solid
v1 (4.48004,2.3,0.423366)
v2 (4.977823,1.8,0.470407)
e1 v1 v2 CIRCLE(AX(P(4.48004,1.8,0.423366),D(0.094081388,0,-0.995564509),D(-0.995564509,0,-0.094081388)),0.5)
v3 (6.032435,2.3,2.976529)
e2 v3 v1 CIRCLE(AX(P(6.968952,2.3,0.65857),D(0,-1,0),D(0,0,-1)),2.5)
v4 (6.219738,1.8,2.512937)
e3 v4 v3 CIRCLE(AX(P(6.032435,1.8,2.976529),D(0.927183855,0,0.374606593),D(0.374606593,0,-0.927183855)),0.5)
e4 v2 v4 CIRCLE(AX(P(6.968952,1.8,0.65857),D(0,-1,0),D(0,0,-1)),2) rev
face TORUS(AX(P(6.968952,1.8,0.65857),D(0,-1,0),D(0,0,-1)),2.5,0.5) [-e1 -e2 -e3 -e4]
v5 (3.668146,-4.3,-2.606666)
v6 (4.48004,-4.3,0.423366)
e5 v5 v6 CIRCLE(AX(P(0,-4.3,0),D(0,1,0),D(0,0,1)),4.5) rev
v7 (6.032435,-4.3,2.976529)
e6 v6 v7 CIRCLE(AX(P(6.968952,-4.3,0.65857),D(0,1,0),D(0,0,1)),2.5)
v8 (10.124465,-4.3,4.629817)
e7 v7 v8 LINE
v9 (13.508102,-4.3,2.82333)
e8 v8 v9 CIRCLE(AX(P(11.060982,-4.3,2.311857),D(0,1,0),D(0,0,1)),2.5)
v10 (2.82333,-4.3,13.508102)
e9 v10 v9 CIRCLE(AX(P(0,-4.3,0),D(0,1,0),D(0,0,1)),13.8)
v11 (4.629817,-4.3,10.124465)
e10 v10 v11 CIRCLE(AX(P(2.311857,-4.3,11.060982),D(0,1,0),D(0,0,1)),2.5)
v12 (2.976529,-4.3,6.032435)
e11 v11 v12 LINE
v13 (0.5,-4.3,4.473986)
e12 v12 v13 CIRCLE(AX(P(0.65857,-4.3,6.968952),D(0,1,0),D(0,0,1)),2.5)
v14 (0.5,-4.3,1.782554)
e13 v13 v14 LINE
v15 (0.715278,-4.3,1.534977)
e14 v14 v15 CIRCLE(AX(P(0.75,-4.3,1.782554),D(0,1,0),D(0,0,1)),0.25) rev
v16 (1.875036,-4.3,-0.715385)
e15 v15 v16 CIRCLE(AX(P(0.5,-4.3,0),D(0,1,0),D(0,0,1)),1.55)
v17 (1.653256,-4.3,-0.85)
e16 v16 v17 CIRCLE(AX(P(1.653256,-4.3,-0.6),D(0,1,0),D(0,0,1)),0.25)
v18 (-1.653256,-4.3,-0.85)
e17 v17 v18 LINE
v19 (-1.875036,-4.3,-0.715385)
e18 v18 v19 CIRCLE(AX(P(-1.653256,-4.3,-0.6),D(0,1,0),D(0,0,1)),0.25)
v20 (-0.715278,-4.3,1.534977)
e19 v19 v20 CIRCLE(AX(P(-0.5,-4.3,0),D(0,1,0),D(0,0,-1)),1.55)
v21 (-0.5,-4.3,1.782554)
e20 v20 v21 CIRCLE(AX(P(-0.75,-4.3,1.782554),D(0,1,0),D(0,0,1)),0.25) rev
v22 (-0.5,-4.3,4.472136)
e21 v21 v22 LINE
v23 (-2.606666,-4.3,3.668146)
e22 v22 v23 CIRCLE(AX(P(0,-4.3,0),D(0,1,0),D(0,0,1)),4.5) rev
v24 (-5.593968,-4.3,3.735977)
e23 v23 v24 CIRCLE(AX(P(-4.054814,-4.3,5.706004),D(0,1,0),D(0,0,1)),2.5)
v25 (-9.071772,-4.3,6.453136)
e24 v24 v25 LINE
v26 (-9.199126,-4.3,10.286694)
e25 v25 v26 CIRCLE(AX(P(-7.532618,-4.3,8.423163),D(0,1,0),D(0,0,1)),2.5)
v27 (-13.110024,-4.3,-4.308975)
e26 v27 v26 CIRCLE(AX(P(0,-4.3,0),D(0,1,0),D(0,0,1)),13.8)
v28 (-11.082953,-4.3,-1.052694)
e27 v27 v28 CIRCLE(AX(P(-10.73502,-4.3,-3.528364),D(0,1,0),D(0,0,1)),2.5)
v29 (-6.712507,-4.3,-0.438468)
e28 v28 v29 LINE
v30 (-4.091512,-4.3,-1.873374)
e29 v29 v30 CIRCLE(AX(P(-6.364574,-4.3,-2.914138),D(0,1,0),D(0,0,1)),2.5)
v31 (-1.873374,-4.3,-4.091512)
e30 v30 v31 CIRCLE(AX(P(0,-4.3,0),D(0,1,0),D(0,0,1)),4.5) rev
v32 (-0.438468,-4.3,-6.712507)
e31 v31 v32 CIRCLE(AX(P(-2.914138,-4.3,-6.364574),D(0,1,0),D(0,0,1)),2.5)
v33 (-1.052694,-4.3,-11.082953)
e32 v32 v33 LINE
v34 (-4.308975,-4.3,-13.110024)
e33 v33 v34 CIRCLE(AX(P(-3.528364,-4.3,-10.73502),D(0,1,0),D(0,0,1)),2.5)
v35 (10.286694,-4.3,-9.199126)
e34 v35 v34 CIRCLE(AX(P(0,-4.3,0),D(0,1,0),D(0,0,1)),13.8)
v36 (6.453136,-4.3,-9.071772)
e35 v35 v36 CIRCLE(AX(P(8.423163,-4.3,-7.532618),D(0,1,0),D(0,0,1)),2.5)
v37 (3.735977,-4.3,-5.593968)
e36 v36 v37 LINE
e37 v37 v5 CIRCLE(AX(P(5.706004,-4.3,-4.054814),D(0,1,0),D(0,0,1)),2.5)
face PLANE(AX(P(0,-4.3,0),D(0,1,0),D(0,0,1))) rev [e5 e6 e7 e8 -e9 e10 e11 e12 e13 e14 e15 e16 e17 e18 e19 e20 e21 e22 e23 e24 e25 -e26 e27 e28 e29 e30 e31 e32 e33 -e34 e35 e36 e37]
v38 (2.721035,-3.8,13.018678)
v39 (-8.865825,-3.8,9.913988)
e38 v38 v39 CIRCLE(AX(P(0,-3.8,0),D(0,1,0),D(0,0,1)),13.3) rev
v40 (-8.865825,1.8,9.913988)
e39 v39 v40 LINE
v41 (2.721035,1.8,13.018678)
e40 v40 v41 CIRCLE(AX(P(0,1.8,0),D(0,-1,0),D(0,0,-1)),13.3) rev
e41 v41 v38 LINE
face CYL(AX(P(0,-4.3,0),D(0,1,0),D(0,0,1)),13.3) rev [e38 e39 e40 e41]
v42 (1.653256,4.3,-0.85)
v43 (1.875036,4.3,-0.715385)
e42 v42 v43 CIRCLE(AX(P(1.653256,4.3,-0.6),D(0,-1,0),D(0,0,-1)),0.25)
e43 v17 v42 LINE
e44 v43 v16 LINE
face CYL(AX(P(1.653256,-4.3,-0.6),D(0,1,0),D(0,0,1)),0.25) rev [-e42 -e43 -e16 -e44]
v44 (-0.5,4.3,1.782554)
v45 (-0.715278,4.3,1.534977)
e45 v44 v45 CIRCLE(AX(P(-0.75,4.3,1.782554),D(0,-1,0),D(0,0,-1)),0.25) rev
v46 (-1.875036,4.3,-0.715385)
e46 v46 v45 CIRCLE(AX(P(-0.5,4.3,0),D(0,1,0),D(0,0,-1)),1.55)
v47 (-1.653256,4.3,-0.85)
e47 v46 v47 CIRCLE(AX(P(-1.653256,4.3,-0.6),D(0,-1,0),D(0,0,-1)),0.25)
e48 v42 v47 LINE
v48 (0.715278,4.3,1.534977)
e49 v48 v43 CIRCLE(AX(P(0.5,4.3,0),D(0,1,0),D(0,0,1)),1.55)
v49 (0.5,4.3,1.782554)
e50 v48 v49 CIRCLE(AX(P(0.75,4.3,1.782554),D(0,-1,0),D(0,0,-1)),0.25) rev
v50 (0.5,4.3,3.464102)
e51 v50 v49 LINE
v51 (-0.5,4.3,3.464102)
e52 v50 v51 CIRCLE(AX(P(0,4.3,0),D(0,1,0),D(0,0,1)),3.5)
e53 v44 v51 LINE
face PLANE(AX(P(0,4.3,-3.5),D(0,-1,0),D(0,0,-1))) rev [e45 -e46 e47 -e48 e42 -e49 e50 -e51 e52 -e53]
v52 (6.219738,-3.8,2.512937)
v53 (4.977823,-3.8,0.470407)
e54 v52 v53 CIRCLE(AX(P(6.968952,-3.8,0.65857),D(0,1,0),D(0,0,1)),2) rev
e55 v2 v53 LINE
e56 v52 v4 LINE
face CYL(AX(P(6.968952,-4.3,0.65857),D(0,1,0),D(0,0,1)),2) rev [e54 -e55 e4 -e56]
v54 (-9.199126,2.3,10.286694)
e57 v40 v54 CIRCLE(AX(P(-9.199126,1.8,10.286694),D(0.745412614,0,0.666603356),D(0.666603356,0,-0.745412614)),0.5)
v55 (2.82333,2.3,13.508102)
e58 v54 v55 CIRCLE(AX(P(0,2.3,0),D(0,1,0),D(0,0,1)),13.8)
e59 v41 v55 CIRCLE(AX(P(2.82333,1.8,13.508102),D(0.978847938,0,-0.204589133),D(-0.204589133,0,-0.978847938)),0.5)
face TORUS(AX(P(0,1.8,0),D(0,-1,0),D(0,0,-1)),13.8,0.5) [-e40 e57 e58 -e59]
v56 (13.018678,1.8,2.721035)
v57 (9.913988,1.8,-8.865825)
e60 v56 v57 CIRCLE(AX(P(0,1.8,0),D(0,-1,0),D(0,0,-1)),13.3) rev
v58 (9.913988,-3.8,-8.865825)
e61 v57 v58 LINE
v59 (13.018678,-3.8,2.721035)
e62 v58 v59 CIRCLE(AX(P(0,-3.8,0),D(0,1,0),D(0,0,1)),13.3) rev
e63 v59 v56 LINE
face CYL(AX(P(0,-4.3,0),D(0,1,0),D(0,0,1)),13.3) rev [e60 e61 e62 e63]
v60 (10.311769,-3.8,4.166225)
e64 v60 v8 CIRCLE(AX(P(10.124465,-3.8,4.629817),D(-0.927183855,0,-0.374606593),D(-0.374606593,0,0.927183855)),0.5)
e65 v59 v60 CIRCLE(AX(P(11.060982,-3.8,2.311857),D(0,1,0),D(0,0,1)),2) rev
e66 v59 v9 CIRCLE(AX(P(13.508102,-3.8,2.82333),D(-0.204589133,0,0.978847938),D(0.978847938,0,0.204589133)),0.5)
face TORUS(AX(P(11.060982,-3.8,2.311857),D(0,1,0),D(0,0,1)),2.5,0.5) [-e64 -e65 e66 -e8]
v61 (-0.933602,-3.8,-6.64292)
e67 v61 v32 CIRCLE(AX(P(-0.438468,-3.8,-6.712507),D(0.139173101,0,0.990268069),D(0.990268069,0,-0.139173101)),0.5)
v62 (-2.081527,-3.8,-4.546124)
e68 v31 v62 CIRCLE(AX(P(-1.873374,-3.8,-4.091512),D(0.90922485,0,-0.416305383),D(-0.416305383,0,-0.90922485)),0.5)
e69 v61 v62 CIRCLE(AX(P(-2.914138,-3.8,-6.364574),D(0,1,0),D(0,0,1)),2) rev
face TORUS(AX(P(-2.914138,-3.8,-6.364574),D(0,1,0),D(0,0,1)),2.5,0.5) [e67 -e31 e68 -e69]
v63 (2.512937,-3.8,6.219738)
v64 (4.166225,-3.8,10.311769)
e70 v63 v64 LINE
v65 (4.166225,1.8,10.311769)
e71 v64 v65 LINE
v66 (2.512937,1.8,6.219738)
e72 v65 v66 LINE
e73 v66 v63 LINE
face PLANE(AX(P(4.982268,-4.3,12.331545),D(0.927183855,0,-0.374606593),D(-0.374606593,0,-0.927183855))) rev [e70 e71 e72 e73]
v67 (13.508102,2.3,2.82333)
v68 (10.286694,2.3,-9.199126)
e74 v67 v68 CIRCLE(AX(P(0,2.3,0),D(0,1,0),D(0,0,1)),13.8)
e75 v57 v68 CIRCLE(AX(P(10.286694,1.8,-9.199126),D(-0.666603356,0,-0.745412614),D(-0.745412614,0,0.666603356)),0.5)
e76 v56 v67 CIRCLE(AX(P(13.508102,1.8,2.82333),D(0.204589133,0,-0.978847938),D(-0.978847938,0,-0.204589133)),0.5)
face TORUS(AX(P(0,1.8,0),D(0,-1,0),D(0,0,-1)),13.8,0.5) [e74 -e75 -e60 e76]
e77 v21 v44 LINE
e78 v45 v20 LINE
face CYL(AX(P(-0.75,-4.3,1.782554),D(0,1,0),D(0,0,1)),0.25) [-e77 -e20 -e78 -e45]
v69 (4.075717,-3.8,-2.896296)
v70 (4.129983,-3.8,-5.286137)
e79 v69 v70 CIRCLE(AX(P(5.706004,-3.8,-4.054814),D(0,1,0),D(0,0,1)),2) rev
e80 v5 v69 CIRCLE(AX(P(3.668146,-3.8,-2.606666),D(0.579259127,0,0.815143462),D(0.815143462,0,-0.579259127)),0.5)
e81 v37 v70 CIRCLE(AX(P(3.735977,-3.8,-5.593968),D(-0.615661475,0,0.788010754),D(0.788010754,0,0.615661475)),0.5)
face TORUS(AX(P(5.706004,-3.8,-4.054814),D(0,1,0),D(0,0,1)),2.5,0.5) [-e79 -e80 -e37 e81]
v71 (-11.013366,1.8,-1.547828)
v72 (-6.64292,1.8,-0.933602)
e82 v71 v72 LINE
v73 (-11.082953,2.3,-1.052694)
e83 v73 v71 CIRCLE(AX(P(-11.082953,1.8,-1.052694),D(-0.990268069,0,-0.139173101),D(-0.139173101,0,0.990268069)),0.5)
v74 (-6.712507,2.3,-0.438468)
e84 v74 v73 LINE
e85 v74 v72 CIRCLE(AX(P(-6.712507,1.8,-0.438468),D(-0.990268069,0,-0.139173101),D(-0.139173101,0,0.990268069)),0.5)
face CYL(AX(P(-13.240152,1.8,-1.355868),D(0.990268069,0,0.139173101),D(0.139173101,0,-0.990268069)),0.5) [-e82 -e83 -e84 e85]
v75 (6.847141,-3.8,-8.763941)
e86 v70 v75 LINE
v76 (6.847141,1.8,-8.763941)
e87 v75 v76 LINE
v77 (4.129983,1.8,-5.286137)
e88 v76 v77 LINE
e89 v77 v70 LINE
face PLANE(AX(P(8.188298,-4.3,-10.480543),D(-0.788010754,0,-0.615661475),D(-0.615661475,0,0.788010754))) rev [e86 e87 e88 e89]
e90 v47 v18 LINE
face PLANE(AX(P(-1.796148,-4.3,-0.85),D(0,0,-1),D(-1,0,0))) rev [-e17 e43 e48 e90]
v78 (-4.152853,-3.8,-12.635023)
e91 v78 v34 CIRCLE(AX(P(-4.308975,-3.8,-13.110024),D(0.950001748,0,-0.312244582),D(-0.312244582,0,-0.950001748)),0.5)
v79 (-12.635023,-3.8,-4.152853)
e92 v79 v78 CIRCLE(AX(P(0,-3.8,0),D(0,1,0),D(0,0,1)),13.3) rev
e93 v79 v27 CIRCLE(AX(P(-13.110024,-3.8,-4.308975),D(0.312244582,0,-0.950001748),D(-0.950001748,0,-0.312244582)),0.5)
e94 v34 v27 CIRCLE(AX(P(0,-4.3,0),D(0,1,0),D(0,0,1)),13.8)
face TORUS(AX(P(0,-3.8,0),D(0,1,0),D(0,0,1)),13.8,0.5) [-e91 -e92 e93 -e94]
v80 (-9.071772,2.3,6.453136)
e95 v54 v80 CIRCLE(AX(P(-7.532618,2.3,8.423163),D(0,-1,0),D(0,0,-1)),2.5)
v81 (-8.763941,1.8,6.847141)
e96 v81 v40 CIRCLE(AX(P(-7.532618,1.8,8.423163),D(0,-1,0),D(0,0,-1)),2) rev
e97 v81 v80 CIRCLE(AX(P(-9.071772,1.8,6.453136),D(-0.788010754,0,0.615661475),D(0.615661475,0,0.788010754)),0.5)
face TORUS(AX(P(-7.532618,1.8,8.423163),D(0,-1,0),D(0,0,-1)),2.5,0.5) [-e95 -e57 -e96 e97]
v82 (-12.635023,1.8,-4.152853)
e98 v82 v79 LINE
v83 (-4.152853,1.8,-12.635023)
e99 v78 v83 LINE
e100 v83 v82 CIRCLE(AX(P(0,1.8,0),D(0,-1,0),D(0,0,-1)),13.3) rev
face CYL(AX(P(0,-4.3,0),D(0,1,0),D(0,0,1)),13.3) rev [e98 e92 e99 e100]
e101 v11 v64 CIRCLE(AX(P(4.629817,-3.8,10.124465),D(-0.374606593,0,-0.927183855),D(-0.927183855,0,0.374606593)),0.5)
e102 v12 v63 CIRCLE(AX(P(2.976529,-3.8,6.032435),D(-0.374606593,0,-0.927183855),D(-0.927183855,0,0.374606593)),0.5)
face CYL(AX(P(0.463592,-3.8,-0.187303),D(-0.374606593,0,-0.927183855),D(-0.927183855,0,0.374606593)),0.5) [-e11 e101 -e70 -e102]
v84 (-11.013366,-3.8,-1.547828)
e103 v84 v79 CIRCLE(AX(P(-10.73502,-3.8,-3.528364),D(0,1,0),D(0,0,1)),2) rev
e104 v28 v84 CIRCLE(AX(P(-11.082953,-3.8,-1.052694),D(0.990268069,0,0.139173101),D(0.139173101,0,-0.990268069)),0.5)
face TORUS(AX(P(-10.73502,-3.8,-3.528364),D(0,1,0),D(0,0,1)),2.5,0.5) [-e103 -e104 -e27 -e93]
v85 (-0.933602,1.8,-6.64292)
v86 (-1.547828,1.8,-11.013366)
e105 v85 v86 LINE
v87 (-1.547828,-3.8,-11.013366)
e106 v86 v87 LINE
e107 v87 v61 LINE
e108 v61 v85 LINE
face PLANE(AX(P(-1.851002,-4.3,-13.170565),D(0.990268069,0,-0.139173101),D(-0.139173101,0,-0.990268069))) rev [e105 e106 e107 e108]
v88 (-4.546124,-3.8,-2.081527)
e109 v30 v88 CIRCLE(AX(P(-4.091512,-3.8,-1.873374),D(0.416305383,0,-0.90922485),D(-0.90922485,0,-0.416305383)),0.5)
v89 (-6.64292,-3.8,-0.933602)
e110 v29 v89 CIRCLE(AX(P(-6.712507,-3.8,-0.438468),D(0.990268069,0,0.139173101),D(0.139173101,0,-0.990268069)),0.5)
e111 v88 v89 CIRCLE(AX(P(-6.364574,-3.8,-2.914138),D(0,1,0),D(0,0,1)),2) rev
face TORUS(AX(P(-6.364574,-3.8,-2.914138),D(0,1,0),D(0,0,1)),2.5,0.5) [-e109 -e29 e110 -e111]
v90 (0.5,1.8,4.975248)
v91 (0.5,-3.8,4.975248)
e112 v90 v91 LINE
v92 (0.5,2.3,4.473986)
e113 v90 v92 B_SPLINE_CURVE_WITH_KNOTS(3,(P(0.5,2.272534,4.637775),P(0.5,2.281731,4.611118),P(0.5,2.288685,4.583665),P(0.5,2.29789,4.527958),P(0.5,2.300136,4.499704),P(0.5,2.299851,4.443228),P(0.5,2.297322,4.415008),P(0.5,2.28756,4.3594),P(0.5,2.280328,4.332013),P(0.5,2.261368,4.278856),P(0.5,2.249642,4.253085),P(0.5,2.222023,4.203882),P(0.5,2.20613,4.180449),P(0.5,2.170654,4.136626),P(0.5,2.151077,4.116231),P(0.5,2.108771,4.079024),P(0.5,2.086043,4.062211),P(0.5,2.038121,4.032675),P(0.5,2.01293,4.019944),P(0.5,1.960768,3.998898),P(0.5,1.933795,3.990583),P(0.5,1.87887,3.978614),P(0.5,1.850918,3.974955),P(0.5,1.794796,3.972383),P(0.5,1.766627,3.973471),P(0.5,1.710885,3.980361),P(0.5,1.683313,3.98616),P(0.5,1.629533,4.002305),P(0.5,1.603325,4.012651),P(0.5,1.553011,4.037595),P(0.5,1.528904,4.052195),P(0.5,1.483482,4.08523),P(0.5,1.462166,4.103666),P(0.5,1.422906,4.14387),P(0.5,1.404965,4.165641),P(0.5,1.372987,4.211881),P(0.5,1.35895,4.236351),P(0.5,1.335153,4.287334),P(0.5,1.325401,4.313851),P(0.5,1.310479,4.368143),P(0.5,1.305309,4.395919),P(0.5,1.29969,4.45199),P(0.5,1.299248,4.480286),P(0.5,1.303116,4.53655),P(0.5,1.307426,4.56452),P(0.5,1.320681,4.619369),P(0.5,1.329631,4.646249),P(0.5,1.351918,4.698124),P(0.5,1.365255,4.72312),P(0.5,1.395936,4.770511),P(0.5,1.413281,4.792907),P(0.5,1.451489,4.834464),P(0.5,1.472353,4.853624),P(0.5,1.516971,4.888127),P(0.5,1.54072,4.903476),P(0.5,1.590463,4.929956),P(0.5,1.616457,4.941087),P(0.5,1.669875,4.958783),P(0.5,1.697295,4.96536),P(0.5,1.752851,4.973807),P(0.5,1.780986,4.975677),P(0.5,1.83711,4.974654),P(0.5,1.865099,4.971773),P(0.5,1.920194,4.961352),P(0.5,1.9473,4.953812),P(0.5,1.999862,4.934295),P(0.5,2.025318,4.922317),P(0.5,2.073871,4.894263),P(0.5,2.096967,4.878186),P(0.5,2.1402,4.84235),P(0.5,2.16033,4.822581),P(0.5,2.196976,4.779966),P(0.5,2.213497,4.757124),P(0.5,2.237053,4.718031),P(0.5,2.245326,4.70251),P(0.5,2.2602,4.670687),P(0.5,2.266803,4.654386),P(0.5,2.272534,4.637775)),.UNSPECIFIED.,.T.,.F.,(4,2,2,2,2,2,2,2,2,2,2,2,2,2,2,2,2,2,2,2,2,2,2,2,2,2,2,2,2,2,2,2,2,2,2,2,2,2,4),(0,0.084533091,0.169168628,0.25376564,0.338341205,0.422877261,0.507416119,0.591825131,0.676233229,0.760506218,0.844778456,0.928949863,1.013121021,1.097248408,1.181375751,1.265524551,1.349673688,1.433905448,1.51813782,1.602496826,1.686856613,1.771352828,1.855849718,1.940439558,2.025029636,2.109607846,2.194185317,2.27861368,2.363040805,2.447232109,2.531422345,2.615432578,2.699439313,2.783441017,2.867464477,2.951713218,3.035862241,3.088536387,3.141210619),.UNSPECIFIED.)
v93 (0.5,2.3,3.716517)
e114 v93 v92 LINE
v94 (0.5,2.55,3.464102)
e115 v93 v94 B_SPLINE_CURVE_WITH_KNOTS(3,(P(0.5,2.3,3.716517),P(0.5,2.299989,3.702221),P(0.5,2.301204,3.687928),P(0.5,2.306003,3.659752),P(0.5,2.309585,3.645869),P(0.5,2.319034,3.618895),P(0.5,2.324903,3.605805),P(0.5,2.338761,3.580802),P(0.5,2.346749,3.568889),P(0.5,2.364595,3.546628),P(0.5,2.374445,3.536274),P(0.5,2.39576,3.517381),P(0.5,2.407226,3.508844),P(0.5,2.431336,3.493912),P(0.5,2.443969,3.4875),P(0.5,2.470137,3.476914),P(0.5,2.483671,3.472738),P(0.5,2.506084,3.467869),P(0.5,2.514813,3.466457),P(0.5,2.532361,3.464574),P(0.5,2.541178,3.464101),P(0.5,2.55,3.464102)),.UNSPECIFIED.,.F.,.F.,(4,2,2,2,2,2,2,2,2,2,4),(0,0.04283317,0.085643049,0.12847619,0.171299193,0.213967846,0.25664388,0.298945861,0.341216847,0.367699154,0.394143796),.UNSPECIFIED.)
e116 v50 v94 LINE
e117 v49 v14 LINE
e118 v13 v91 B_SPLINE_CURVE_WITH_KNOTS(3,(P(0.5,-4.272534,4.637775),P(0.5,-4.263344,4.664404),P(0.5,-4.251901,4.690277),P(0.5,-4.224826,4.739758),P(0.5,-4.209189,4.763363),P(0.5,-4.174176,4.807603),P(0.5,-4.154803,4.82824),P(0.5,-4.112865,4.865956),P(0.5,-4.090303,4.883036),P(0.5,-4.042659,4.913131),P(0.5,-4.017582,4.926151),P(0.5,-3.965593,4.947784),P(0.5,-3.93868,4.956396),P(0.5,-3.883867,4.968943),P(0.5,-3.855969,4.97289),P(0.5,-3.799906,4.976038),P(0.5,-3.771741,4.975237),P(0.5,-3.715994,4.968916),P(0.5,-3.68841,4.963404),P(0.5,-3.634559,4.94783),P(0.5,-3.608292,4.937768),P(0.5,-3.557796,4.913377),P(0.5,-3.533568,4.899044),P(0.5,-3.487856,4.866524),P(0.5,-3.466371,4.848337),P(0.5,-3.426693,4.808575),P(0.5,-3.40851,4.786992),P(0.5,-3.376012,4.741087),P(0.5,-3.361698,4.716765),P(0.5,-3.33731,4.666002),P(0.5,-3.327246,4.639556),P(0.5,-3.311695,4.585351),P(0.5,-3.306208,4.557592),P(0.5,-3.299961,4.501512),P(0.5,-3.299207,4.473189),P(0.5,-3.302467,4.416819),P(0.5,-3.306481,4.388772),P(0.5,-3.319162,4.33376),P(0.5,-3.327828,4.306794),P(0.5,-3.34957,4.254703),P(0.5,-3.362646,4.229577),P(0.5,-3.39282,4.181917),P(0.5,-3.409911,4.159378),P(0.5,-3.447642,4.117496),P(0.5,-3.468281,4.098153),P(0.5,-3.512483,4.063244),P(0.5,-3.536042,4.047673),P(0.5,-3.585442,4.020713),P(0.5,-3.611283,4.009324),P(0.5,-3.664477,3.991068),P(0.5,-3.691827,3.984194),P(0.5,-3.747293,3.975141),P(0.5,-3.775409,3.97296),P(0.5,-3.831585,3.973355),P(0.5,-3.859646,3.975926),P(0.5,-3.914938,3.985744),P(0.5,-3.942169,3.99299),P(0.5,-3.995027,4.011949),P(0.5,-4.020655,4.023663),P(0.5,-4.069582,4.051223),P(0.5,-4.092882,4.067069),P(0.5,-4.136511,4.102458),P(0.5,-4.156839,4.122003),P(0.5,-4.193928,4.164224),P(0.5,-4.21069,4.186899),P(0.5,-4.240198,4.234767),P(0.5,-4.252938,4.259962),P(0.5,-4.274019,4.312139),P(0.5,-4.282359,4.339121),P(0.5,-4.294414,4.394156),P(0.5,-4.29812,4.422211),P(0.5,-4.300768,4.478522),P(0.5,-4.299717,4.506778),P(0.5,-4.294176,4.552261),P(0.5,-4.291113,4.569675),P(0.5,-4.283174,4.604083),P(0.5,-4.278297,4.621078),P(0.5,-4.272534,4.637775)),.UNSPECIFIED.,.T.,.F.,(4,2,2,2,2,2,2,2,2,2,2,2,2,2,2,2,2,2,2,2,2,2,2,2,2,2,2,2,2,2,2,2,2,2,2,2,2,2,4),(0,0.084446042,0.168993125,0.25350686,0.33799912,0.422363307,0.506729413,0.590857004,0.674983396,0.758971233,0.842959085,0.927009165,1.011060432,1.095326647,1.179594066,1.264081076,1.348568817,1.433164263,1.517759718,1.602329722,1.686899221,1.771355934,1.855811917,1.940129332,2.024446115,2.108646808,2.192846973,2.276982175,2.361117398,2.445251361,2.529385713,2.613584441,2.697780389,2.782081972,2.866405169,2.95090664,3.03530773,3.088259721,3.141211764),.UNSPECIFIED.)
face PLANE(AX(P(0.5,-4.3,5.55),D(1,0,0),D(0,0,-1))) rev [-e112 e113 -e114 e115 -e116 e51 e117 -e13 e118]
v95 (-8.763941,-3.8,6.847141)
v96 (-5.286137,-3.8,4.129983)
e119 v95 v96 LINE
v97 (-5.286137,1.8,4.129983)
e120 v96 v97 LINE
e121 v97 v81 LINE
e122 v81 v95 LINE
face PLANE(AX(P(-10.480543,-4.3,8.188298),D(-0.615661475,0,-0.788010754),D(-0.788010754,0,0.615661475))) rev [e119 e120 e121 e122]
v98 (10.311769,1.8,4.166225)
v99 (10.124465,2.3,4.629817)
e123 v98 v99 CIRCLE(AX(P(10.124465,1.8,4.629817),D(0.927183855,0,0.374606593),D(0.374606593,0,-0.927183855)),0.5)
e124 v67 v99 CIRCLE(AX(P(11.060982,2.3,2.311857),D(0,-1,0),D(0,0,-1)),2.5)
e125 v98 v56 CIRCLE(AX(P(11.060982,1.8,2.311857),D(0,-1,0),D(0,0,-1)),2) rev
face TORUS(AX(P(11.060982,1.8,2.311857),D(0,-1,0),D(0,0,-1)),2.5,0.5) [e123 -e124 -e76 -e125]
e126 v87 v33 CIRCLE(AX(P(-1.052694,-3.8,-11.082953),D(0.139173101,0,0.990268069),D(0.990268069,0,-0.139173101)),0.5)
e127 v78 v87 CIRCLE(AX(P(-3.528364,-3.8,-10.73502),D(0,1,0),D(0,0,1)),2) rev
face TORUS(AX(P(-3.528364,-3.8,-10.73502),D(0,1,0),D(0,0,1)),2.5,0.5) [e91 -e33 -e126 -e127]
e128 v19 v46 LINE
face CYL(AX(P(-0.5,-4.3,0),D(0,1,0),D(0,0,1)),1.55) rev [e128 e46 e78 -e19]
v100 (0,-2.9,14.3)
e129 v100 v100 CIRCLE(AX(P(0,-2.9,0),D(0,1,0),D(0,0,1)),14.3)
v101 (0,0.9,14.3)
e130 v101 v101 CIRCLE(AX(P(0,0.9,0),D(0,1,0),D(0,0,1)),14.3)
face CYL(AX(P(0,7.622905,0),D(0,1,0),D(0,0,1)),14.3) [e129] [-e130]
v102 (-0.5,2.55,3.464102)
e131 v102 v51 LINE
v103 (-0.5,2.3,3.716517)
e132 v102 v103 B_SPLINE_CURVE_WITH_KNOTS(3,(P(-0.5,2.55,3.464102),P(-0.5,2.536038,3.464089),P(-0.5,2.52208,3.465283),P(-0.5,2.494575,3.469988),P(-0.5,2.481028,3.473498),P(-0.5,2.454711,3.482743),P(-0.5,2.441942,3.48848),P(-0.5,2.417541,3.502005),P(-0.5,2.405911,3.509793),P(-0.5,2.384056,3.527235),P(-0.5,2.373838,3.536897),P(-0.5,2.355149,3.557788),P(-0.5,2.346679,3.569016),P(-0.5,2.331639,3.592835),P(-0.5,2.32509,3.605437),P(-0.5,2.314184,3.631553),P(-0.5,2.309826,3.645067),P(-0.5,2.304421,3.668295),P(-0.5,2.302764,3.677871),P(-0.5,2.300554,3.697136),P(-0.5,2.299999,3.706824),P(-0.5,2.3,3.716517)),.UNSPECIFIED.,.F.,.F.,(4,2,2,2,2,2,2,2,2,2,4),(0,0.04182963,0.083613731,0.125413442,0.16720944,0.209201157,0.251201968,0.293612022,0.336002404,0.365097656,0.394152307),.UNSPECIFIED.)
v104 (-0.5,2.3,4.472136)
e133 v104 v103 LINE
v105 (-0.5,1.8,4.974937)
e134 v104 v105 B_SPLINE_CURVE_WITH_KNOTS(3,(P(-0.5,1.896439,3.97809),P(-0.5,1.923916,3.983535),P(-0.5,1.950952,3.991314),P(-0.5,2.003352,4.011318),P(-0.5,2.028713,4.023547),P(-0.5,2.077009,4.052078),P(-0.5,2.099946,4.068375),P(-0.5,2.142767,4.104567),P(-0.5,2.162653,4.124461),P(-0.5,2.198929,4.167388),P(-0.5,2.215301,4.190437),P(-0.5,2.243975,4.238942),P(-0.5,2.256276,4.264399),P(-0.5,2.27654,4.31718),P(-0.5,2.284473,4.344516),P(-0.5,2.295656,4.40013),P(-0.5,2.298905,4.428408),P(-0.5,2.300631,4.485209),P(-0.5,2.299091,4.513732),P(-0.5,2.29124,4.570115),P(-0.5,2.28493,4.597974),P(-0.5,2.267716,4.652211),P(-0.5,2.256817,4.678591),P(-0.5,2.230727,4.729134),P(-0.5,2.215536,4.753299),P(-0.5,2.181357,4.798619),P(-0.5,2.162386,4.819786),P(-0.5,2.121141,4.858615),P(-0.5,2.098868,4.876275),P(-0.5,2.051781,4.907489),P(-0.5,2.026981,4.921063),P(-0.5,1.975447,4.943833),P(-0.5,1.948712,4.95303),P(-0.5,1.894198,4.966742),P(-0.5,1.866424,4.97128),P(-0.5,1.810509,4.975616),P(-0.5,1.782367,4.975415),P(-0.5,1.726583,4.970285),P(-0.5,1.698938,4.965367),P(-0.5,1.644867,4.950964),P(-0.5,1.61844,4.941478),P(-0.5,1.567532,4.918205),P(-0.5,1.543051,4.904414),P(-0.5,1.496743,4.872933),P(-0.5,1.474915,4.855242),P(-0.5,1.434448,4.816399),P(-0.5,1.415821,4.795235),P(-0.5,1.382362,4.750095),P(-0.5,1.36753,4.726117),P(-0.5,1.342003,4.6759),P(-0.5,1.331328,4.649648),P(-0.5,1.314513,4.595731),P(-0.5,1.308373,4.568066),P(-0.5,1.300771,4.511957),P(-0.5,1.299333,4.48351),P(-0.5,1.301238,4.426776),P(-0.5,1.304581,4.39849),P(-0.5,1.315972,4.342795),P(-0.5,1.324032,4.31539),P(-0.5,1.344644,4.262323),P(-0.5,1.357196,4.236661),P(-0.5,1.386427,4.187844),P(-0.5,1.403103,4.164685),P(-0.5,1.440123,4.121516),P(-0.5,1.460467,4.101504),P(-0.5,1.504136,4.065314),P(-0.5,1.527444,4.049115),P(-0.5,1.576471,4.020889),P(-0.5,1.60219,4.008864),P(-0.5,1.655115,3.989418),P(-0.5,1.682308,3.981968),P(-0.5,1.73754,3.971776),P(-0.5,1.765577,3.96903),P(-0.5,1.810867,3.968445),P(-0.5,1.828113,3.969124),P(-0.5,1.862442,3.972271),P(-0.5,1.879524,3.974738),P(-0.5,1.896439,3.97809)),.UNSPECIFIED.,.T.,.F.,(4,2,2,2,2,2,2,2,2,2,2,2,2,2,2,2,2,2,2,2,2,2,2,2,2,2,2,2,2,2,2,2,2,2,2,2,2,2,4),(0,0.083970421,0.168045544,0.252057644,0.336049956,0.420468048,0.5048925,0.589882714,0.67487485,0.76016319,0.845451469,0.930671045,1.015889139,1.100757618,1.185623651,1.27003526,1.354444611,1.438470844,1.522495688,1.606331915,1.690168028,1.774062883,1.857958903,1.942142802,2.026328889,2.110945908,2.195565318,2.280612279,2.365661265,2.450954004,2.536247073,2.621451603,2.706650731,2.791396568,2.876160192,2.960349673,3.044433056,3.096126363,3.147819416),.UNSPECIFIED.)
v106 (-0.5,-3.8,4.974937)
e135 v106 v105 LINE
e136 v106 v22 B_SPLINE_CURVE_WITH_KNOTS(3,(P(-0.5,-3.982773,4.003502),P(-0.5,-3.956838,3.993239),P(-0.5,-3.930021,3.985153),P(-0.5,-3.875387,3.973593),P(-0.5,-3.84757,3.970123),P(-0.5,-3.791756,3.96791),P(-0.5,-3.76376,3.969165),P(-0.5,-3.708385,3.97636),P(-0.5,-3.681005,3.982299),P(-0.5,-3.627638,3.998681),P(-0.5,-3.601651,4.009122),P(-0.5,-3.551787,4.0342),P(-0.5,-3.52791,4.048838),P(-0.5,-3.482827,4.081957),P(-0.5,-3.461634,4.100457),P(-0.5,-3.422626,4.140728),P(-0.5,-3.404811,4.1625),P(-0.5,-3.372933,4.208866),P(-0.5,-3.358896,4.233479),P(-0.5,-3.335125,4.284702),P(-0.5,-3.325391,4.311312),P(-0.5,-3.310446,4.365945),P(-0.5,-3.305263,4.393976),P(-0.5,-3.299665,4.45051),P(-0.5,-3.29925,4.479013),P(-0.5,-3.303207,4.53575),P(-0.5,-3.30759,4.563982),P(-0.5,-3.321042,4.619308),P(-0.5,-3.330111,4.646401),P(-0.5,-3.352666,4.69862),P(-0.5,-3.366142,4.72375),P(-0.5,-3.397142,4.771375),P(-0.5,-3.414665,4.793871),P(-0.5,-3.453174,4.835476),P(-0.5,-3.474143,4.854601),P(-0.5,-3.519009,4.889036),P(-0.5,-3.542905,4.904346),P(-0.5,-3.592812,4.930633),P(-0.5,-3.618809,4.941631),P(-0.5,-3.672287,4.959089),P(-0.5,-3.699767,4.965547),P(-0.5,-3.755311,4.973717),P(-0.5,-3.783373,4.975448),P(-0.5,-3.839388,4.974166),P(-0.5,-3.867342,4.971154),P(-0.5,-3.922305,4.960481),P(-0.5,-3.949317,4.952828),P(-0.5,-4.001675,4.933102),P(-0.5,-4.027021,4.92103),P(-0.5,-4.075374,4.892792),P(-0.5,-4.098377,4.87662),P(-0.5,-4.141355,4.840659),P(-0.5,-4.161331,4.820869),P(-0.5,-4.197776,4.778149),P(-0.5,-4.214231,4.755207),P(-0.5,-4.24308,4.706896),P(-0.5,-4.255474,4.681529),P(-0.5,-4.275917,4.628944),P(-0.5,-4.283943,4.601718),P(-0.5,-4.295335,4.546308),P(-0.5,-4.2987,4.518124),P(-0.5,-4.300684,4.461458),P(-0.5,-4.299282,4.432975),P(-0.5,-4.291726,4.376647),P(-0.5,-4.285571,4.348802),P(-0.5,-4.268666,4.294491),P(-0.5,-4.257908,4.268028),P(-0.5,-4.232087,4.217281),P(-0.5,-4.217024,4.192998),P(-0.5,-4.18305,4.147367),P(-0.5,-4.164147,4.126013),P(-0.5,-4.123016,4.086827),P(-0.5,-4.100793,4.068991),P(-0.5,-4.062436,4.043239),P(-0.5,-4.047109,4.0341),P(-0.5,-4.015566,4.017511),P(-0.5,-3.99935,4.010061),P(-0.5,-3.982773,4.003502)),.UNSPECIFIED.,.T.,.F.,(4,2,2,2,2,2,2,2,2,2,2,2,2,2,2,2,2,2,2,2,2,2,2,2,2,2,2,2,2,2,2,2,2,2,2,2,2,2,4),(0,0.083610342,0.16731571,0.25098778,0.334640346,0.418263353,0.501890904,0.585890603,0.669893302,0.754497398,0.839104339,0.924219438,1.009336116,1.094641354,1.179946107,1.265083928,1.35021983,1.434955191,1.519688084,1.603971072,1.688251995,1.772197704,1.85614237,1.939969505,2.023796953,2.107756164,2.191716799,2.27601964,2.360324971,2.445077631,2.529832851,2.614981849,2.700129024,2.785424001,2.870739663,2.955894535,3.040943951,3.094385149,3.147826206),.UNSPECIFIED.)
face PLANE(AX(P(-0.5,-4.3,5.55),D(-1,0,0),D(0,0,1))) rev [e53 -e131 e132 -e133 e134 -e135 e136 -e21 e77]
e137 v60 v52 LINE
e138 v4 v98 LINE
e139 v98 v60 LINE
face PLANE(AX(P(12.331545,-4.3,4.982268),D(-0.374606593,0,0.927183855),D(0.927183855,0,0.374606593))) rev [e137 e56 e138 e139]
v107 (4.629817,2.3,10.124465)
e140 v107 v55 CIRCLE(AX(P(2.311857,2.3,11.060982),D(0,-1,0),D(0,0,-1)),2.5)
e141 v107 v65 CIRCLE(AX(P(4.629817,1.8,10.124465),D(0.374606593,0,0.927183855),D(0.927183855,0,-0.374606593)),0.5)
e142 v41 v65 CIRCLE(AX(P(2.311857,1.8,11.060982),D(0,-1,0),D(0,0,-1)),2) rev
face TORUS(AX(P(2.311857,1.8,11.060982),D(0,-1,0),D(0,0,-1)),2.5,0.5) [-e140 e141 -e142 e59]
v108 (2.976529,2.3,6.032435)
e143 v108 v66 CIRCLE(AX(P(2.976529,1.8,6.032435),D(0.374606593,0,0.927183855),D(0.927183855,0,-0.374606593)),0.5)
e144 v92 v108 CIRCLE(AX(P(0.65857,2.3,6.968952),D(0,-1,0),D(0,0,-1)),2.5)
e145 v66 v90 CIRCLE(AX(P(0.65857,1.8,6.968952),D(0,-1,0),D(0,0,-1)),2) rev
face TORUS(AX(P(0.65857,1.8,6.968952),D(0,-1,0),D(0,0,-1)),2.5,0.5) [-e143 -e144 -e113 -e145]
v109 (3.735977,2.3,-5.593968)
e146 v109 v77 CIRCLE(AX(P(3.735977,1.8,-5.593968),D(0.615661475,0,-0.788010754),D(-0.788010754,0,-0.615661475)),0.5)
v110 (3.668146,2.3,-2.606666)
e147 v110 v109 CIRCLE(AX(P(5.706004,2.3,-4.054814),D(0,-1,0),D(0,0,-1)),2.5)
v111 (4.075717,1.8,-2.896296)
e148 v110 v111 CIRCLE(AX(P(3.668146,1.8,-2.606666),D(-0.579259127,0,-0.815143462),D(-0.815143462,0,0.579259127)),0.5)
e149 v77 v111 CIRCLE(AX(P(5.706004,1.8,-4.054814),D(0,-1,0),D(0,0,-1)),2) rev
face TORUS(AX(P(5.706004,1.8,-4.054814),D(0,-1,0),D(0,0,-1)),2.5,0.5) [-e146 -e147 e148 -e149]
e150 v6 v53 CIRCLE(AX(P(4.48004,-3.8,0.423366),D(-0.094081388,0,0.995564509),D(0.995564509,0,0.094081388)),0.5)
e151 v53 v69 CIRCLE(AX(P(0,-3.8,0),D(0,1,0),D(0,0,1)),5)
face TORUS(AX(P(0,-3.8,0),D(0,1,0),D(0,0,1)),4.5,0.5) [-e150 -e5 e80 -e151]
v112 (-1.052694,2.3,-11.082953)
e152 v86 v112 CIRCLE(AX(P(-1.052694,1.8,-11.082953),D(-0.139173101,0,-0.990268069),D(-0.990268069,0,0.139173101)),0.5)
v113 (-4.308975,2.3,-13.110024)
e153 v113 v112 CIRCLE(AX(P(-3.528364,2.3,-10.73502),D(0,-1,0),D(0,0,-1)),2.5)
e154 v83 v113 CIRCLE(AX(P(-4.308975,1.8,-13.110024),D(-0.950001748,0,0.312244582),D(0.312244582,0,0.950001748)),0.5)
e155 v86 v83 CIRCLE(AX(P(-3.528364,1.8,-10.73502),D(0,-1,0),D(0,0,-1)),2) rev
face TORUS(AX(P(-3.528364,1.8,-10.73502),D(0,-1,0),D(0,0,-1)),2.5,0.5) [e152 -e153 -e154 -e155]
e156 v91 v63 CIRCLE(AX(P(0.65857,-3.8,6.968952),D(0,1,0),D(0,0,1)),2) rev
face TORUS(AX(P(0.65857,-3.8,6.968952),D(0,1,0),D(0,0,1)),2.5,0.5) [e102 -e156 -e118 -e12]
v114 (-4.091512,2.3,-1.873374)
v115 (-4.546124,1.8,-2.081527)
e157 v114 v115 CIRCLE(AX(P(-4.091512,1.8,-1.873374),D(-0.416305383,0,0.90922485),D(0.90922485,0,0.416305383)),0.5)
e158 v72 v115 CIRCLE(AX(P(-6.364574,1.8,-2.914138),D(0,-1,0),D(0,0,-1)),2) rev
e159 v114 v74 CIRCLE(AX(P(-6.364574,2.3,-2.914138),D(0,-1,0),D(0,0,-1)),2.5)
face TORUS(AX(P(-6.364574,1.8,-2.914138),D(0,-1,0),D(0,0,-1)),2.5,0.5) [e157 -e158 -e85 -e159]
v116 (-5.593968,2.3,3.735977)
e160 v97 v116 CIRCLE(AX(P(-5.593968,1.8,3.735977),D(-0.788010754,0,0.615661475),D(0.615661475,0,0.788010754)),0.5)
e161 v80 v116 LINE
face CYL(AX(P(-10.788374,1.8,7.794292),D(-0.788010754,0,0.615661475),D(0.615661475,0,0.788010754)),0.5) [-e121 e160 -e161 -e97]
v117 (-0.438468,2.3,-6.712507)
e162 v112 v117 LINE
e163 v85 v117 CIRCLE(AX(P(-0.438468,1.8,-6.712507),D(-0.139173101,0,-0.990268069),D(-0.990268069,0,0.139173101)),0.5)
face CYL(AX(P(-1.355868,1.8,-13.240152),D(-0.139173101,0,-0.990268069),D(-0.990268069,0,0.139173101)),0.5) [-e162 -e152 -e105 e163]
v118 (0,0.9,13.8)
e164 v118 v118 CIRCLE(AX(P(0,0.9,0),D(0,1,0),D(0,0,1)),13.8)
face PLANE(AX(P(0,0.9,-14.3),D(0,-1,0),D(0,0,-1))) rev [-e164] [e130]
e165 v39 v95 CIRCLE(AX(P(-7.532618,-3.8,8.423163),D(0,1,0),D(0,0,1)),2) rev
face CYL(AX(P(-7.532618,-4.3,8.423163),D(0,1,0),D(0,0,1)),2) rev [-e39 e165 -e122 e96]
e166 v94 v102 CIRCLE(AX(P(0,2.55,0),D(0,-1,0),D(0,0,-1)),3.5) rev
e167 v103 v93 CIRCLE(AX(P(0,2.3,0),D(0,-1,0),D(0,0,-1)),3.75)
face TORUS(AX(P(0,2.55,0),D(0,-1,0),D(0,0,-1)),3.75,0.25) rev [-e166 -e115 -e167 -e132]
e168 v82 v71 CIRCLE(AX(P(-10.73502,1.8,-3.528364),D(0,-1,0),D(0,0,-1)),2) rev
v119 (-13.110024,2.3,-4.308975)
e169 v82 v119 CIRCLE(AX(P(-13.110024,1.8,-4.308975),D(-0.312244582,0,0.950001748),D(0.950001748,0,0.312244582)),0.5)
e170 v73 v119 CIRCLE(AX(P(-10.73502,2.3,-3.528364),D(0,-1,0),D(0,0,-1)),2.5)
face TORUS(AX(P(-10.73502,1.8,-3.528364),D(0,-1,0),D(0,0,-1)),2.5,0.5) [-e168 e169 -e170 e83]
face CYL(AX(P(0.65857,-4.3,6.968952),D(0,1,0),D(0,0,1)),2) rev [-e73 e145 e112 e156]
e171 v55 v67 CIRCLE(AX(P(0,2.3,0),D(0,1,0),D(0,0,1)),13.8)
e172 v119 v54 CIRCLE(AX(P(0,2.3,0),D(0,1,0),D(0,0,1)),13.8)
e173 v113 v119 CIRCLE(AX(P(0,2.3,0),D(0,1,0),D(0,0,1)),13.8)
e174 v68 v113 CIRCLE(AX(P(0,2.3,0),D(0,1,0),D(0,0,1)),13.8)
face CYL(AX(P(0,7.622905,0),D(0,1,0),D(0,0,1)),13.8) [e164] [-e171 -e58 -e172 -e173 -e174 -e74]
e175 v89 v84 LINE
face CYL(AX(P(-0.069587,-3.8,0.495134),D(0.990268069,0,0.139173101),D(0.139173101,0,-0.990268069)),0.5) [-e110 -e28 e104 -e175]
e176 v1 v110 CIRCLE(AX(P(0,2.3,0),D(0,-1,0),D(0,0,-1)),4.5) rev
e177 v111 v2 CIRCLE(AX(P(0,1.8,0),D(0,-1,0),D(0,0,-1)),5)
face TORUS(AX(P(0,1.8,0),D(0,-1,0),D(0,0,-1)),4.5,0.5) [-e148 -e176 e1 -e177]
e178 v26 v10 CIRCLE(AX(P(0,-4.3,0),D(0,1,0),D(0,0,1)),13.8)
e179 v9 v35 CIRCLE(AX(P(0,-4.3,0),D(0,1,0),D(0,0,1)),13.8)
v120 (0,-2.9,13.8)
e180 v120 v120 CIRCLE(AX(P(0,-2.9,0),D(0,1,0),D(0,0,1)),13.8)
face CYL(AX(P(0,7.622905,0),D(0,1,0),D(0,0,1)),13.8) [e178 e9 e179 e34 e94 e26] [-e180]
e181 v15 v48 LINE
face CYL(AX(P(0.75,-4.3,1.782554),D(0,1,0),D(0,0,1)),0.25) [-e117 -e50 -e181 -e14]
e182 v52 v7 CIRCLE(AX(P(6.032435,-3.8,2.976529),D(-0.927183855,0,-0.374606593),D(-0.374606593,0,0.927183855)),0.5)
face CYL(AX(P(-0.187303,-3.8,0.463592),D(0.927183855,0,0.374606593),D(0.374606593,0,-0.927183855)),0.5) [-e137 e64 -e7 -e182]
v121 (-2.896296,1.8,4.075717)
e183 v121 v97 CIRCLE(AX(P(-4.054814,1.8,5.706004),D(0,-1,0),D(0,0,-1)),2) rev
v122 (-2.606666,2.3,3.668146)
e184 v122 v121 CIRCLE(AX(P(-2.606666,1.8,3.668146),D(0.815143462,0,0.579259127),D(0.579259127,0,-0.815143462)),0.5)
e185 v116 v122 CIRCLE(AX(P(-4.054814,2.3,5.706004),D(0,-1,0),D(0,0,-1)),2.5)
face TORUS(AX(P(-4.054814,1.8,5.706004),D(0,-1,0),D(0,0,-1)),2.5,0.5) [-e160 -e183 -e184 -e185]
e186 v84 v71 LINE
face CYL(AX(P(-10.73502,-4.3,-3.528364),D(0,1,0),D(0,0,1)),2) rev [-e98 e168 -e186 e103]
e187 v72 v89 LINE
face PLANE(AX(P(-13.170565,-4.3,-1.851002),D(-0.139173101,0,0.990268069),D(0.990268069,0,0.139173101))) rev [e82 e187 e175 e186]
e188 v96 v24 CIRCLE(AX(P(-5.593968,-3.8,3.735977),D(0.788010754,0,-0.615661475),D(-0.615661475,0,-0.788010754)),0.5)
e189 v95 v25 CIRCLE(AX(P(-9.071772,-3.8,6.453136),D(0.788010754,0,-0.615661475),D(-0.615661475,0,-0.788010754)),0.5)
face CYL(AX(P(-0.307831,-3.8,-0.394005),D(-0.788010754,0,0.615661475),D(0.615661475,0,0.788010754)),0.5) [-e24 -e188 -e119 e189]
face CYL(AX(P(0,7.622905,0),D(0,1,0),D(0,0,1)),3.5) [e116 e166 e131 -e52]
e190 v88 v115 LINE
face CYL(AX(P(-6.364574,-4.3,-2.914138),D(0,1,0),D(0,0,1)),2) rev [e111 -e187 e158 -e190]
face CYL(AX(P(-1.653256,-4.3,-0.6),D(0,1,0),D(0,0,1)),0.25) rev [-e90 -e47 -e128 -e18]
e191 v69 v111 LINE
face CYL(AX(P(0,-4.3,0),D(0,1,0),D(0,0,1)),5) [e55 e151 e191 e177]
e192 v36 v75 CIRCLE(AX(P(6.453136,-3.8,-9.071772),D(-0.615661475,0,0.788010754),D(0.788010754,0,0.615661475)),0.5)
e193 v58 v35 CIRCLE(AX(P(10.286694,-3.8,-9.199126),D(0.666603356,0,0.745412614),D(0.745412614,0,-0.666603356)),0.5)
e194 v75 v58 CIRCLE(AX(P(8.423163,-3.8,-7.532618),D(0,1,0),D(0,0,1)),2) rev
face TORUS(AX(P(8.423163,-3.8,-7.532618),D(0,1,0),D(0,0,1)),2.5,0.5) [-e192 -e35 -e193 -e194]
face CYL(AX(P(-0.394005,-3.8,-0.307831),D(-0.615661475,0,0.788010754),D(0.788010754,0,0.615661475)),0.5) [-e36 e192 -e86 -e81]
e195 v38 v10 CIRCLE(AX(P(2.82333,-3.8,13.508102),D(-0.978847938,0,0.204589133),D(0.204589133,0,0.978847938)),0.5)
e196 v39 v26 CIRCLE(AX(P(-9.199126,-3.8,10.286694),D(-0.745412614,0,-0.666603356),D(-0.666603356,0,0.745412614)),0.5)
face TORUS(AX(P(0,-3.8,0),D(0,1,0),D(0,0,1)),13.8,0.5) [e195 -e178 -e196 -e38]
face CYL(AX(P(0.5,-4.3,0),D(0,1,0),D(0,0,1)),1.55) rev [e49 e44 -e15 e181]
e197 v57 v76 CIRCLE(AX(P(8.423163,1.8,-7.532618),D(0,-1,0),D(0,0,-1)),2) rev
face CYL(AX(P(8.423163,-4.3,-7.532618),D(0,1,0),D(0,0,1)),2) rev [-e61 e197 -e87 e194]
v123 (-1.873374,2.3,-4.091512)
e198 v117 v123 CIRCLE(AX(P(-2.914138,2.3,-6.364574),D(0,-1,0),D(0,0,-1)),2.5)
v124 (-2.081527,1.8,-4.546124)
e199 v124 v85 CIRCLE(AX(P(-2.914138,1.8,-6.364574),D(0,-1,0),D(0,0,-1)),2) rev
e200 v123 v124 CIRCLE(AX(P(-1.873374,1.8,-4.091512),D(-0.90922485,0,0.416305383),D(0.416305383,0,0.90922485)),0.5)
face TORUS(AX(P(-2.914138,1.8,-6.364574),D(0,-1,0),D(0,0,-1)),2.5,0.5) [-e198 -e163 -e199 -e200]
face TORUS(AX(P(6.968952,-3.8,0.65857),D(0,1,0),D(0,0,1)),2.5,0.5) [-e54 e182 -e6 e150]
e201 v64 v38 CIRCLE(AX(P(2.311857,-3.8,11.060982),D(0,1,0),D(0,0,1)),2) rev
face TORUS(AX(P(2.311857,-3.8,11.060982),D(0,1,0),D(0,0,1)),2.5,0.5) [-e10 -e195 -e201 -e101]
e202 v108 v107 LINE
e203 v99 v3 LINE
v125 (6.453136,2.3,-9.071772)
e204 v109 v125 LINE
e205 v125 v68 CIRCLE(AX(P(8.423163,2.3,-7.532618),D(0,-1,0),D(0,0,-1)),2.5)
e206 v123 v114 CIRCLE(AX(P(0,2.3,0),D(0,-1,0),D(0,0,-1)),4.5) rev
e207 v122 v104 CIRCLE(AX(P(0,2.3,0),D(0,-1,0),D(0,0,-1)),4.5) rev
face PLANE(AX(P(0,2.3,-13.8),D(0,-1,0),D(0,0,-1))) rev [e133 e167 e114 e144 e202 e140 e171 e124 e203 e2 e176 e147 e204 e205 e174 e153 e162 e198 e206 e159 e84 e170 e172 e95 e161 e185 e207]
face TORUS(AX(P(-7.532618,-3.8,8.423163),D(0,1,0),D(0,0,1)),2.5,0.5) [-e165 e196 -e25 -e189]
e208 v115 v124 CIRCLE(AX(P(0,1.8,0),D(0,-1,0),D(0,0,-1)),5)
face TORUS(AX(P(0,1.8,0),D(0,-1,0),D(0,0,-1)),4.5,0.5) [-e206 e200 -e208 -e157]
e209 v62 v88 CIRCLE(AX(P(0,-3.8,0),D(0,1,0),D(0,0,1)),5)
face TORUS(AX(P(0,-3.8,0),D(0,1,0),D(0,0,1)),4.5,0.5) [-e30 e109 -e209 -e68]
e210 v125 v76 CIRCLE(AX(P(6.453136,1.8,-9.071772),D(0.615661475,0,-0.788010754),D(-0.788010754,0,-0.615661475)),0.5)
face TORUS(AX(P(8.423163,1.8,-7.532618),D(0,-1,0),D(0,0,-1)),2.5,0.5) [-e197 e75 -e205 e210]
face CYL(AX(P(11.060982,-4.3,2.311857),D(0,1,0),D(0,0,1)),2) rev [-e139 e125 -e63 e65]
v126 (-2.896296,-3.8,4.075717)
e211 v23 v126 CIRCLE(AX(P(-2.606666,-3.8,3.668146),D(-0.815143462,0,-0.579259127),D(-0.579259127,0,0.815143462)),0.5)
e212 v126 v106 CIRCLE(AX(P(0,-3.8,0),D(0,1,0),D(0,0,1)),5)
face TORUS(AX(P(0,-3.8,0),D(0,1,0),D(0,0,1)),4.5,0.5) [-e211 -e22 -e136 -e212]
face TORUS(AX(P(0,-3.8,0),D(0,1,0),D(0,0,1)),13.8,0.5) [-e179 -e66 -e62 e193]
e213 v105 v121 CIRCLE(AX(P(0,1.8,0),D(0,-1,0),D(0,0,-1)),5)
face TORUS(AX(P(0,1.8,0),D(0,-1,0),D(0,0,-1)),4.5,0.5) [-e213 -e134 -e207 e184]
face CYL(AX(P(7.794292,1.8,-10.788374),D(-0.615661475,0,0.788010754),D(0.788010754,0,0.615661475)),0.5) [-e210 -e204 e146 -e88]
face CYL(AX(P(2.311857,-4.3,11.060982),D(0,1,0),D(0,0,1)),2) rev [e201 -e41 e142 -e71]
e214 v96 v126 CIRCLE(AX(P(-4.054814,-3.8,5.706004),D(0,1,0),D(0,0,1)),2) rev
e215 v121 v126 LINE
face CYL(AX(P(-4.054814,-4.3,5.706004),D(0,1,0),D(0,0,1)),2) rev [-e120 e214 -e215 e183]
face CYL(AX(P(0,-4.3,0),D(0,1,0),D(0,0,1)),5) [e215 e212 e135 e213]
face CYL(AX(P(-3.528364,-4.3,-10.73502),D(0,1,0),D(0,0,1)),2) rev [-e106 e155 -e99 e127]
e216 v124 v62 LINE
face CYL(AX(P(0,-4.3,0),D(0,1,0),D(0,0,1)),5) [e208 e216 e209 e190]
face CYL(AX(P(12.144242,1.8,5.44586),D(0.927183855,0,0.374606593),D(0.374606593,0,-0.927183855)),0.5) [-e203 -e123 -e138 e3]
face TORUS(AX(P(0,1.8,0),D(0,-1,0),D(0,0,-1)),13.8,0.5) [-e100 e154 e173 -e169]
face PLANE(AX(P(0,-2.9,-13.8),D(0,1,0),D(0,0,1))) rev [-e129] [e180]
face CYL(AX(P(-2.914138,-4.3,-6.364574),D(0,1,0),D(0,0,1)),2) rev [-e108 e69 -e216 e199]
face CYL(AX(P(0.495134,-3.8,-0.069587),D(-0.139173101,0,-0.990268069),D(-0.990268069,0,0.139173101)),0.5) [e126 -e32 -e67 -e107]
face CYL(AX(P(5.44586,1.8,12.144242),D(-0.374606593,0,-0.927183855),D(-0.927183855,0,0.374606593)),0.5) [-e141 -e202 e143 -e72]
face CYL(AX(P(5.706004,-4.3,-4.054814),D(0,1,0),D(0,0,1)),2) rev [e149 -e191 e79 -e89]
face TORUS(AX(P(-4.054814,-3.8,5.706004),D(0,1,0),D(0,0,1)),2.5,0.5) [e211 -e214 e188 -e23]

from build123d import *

# Parameters (mm, degrees)
CUT_EXTRUDE1_DEPTH       = 22.272987566
FILLET1_R                = 2
FILLET2_R                = 0.5
CIRPATTERN1_COUNT        = 3
FILLET1_OF_CIRPATTERN1_R = 2
FILLET2_OF_CIRPATTERN1_R = 0.5
CUT_EXTRUDE3_DEPTH       = 22.975895925
FILLET3_R                = 0.25
FILLET4_R                = 0.25


with BuildPart() as part:
    # Sketch1 → Revolve1 (revolve)
    with BuildSketch(Plane(origin=(0, 0, 0), x_dir=(0, 0, -1), z_dir=(1, 0, 0)), mode=Mode.PRIVATE) as revolve1_sk:
        Polygon((0, -4.3), (13.8, -4.3), (13.8, -2.9), (14.3, -2.9), (14.3, 0.9), (13.8, 0.9), (13.8, 2.3), (3.5, 2.3), (3.5, 4.3), (0, 4.3), align=None)
    revolve(revolve1_sk.sketch.rotate(Axis((0, 7.622905435, 0), (0, -1, 0)), 180), axis=Axis((0, 7.622905435, 0), (0, -1, 0)))

    # Sketch2 → Cut-Extrude1 (cut, through all)
    with BuildSketch(Plane(origin=(0, 2.3, 0), x_dir=(1, 0, 0), z_dir=(0, 1, 0))):
        with BuildLine():
            Line((-1.851002243, 13.170565314), (-0.695865505, 4.951340344))
            ThreePointArc((-0.695865505, 4.951340344), (-3.535533906, 3.535533906), (-4.951340344, 0.695865505))
            Line((-4.951340344, 0.695865505), (-13.170565314, 1.851002243))
            ThreePointArc((-13.170565314, 1.851002243), (-9.40452019, 9.40452019), (-1.851002243, 13.170565314))
        make_face()
    cut_extrude1 = extrude(amount=-CUT_EXTRUDE1_DEPTH, mode=Mode.SUBTRACT)

    # Fillet1
    fillet1_edges = [part.edges().sort_by_distance(p)[0] for p in [
        (-13.170565314, -1, -1.851002243),
        (-1.851002243, -1, -13.170565314),
        (-0.695865505, -1, -4.951340344),
        (-4.951340344, -1, -0.695865505),
    ]]
    fillet(fillet1_edges, radius=FILLET1_R)

    # Fillet2
    fillet2_edges = [part.edges().sort_by_distance(p)[0] for p in [
        (-3.535533906, 2.3, -3.535533906),
        (-3.535533906, -4.3, -3.535533906),
        (-8.828143052, 2.3, -1.240714593),
        (-8.828143052, -4.3, -1.240714593),
        (-1.240714593, 2.3, -8.828143052),
        (-1.240714593, -4.3, -8.828143052),
        (-9.40452019, 2.3, -9.40452019),
        (-9.40452019, -4.3, -9.40452019),
        (-5.404150679, 2.3, -1.159832365),
        (-5.404150679, -4.3, -1.159832365),
        (-1.159832365, 2.3, -5.404150679),
        (-1.159832365, -4.3, -5.404150679),
        (-12.432912873, 2.3, -2.471406383),
        (-12.432912873, -4.3, -2.471406383),
        (-2.471406383, 2.3, -12.432912873),
        (-2.471406383, -4.3, -12.432912873),
    ]]
    fillet(fillet2_edges, radius=FILLET2_R - 0.0001)  # a hair under: the kernel refuses the full size

    # CirPattern1: Cut-Extrude1 ×3 about axis
    cirpattern1_axis = Axis((0, 0, 0), (0, 1, 0))
    for i in range(1, CIRPATTERN1_COUNT):
        add(cut_extrude1.rotate(cirpattern1_axis, i * 360 / CIRPATTERN1_COUNT), mode=Mode.SUBTRACT)

    # Fillet1 of CirPattern1
    fillet1_of_cirpattern1_edges = [part.edges().sort_by_distance(p)[0] for p in [
        (4.982267692, -1, 12.331545266),
        (-10.480543023, -1, 8.188297622),
        (-3.940053768, -1, 3.078307377),
        (1.873032967, -1, 4.635919273),
        (8.188297622, -1, -10.480543023),
        (12.331545266, -1, 4.982267692),
        (4.635919273, -1, 1.873032967),
        (3.078307377, -1, -3.940053768),
    ]]
    fillet(fillet1_of_cirpattern1_edges, radius=FILLET1_OF_CIRPATTERN1_R)

    # Fillet2 of CirPattern1
    fillet2_of_cirpattern1_edges = [part.edges().sort_by_distance(p)[0] for p in [
        (-1.294095226, 2.3, 4.829629131),
        (-1.294095226, -4.3, 4.829629131),
        (3.339581169, 2.3, 8.265753448),
        (3.339581169, -4.3, 8.265753448),
        (-7.025038855, 2.3, 5.488561883),
        (-7.025038855, -4.3, 5.488561883),
        (-3.4422933, 2.3, 12.84681349),
        (-3.4422933, -4.3, 12.84681349),
        (1.697631047, 2.3, 5.260047957),
        (1.697631047, -4.3, 5.260047957),
        (-4.100215591, 2.3, 3.706519632),
        (-4.100215591, -4.3, 3.706519632),
        (4.076155726, 2.3, 12.002921582),
        (4.076155726, -4.3, 12.002921582),
        (-9.5315152, 2.3, 8.356757147),
        (-9.5315152, -4.3, 8.356757147),
        (4.829629131, 2.3, -1.294095226),
        (4.829629131, -4.3, -1.294095226),
        (5.488561883, 2.3, -7.025038855),
        (5.488561883, -4.3, -7.025038855),
        (8.265753448, 2.3, 3.339581169),
        (8.265753448, -4.3, 3.339581169),
        (12.84681349, 2.3, -3.4422933),
        (12.84681349, -4.3, -3.4422933),
        (3.706519632, 2.3, -4.100215591),
        (3.706519632, -4.3, -4.100215591),
        (5.260047957, 2.3, 1.697631047),
        (5.260047957, -4.3, 1.697631047),
        (8.356757147, 2.3, -9.5315152),
        (8.356757147, -4.3, -9.5315152),
        (12.002921582, 2.3, 4.076155726),
        (12.002921582, -4.3, 4.076155726),
    ]]
    fillet(fillet2_of_cirpattern1_edges, radius=FILLET2_OF_CIRPATTERN1_R - 0.0001)  # a hair under: the kernel refuses the full size

    # Sketch3 → Cut-Extrude3 (cut, through all)
    with BuildSketch(Plane(origin=(0, 4.3, 0), x_dir=(1, 0, 0), z_dir=(0, 1, 0))):
        with BuildLine():
            Line((-0.5, -5.55), (-0.5, -1.55))
            ThreePointArc((-0.5, -1.55), (-1.86381817, -0.736545993), (-1.79614814, 0.85))
            Line((-1.79614814, 0.85), (1.79614814, 0.85))
            ThreePointArc((1.79614814, 0.85), (1.86381817, -0.736545993), (0.5, -1.55))
            Line((0.5, -1.55), (0.5, -5.55))
            Line((0.5, -5.55), (-0.5, -5.55))
        make_face()
    extrude(amount=-CUT_EXTRUDE3_DEPTH, mode=Mode.SUBTRACT)

    # Fillet3
    fillet3_edges = [part.edges().sort_by_distance(p)[0] for p in [
        (0.5, 0, 1.55),
        (-0.5, 0, 1.55),
        (-1.79614814, 0, -0.85),
        (1.79614814, 0, -0.85),
    ]]
    fillet(fillet3_edges, radius=FILLET3_R)

    # Fillet4
    fillet4_edges = [part.edges().sort_by_distance(p)[0] for p in [
        (0, 2.3, -3.5),
    ]]
    fillet(fillet4_edges, radius=FILLET4_R)


solid = part.part
